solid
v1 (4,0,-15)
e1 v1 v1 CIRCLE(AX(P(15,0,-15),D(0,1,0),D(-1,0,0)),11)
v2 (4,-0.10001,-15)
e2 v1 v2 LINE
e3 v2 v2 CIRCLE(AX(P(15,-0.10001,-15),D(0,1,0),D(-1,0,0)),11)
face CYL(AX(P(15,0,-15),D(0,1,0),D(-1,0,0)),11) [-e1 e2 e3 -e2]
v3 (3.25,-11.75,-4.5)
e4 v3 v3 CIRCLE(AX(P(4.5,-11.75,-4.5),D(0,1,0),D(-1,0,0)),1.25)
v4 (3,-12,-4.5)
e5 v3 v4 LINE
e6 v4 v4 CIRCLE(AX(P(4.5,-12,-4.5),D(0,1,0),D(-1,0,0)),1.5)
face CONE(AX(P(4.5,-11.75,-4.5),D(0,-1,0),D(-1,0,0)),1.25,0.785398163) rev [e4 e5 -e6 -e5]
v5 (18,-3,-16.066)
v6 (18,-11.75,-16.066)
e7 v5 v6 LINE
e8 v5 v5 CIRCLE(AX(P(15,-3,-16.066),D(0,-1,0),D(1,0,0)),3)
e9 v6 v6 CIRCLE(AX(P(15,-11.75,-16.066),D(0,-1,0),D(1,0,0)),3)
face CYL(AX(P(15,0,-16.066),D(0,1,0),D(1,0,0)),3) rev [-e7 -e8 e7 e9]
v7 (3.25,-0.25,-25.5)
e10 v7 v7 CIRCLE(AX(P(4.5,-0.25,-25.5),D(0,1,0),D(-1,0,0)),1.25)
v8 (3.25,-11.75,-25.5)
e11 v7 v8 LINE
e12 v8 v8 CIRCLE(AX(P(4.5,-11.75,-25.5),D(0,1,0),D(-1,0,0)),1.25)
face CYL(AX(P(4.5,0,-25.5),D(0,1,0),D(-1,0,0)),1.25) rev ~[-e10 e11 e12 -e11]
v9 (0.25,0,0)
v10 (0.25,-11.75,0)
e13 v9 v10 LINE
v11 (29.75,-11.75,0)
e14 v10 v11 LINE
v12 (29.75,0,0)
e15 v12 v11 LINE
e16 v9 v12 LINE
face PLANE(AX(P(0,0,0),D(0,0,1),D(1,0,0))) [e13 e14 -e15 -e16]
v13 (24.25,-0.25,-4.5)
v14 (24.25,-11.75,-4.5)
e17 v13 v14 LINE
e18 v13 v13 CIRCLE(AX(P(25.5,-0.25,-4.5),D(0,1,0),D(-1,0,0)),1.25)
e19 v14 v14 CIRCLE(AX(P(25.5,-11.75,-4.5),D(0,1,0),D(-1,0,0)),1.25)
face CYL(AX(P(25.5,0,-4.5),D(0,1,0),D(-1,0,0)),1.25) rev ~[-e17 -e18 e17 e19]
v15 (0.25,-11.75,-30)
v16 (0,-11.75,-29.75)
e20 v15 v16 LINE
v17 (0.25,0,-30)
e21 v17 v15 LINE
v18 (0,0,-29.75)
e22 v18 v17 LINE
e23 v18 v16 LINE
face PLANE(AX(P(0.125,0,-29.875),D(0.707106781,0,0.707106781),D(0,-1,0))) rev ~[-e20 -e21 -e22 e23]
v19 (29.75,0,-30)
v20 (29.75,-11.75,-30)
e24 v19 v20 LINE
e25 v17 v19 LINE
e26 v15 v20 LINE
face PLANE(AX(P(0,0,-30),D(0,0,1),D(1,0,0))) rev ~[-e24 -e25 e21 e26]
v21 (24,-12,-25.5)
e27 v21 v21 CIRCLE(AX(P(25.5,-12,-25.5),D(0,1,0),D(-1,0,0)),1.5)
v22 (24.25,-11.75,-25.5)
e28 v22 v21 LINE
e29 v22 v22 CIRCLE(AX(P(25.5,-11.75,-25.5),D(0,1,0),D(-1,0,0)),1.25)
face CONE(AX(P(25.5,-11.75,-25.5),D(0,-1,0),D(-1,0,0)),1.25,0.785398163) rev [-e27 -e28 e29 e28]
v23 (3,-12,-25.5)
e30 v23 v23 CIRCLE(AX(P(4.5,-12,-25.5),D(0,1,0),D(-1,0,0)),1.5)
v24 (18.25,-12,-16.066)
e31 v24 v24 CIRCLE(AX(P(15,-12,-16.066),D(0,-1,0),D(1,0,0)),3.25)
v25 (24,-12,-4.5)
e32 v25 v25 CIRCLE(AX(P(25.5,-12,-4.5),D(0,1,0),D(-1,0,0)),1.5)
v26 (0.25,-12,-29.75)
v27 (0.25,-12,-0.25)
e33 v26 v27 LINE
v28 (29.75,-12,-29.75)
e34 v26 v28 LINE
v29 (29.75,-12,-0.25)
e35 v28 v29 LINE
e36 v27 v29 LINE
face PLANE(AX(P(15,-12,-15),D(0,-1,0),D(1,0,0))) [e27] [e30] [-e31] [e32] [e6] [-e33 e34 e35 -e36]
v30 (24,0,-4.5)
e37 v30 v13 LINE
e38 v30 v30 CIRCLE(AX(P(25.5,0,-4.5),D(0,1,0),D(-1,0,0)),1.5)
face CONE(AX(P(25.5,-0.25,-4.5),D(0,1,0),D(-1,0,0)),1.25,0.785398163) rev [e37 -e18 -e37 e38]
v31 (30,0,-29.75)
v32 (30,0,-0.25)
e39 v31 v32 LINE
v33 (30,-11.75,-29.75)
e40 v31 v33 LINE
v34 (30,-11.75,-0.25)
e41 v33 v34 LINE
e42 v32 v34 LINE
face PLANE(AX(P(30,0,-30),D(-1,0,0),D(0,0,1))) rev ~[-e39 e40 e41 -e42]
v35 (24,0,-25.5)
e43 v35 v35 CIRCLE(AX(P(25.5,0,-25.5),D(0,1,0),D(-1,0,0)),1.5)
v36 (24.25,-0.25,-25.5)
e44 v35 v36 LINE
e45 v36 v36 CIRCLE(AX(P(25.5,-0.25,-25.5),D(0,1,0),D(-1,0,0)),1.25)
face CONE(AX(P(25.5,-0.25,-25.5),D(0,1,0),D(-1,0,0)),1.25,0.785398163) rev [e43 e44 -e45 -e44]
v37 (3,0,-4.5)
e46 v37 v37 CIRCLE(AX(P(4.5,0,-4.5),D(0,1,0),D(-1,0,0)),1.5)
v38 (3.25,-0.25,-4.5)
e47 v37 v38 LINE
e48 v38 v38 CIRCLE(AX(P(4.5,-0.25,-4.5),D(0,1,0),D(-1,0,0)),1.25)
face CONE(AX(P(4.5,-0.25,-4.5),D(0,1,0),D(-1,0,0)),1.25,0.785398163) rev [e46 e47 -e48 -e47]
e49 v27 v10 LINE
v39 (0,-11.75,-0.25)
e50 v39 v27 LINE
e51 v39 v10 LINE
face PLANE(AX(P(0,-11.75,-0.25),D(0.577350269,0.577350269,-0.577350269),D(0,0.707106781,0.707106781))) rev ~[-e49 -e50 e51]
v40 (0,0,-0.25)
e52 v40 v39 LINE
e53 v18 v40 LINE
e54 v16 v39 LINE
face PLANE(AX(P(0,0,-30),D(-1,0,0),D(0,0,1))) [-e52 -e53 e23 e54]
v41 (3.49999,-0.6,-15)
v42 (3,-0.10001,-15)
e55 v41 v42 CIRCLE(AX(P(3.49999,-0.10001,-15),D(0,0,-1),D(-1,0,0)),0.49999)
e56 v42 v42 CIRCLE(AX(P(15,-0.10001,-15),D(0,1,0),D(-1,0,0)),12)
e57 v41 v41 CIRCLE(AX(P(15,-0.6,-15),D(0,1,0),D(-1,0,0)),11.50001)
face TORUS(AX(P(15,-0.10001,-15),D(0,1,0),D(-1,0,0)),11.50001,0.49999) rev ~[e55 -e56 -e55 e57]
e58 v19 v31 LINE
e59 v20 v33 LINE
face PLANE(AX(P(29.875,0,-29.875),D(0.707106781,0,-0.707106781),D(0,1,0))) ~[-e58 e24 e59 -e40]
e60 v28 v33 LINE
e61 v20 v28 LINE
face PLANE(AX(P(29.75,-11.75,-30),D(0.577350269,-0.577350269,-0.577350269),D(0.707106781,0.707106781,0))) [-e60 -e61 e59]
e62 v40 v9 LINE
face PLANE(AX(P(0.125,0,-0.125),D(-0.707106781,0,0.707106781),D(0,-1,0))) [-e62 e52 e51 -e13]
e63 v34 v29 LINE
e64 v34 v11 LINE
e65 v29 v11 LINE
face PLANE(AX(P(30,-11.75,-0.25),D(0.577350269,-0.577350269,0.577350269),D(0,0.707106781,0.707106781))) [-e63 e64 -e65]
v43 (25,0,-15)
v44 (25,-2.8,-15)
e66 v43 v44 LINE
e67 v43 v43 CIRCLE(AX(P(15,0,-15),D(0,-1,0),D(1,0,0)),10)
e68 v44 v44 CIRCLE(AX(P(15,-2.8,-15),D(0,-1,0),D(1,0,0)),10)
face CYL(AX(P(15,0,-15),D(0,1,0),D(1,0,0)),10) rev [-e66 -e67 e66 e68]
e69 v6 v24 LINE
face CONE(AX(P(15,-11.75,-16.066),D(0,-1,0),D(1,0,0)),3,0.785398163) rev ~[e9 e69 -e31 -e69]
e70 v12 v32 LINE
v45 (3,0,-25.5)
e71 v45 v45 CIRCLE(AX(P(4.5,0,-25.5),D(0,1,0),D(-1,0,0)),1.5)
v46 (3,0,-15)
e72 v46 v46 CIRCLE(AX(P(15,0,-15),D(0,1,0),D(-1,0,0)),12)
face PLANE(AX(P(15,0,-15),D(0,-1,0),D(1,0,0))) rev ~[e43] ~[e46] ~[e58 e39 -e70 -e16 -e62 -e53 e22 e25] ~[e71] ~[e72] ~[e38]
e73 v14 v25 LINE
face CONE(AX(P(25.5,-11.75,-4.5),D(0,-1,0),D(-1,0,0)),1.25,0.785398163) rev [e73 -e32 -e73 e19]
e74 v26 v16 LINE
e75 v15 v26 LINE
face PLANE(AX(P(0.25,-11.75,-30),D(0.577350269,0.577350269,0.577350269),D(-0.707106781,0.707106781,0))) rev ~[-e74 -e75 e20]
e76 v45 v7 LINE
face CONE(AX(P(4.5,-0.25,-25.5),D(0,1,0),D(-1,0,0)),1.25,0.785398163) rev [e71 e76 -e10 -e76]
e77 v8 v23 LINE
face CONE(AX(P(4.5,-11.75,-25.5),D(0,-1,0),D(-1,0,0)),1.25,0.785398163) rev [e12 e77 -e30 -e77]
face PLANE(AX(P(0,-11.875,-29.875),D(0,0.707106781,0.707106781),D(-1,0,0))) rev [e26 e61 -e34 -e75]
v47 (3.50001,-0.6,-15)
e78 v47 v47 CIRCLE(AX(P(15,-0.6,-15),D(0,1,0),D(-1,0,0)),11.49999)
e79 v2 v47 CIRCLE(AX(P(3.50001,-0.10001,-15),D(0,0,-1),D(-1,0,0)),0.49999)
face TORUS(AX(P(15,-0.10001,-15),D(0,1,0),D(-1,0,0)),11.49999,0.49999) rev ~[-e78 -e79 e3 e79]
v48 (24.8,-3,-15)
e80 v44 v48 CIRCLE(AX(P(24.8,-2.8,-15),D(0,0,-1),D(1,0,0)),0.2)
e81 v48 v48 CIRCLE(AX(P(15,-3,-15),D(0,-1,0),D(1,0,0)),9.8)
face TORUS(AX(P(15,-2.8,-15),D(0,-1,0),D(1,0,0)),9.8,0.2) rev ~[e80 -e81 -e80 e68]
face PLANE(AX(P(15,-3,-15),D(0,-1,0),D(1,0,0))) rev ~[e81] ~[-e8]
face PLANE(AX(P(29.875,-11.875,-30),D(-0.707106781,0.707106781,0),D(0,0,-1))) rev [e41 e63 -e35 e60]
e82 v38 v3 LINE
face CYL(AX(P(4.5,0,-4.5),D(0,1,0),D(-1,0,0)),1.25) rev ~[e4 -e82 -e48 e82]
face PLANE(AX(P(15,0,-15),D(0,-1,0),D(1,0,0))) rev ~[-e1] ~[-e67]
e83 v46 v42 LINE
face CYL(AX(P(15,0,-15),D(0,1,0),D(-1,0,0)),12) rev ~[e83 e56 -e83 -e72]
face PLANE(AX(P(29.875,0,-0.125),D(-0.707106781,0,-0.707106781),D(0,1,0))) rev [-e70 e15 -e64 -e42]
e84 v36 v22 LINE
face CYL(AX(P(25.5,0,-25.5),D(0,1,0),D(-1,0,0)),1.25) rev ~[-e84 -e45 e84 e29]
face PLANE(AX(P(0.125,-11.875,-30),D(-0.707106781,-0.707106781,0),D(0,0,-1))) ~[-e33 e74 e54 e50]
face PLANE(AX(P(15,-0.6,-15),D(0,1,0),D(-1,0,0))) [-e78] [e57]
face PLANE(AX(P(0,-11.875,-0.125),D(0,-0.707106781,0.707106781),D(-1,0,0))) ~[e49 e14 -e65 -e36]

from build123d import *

# Parameters (mm, degrees)
F0_W     = 30
F0_H     = 30
F0_R     = 10
F0_R_2   = 3
F1_DEPTH = 12
F2_DEPTH = 3
F3_R     = 0.2
F4_R     = 12
F4_R_2   = 11
F5_DEPTH = 0.6
F6_R     = 0.49999
F4_R_3   = 1.25
F7_DEPTH = 25
F8_SIZE  = 0.25


# Not quite as in the source:
# - a fillet or chamfer is up to 0.001 mm smaller than in the source, because OpenCascade refuses the exact size


with BuildPart() as f1:
    # F0 (on Front) → F1 (new body)
    with BuildSketch(Plane.XZ):
        with Locations((15, -15)):
            Rectangle(F0_W, F0_H)
        with Locations((15, -15)):
            Circle(F0_R, mode=Mode.SUBTRACT)
        with Locations((15, -15)):
            Circle(F0_R)
        with Locations((15, -16.066)):
            Circle(F0_R_2, mode=Mode.SUBTRACT)
    extrude(amount=F1_DEPTH)

    # F0 (on Front) → F2 (cut)
    with BuildSketch(Plane.XZ):
        with Locations((15, -15)):
            Circle(F0_R)
        with Locations((15, -16.066)):
            Circle(F0_R_2, mode=Mode.SUBTRACT)
    extrude(amount=F2_DEPTH, mode=Mode.SUBTRACT)

    # F3
    f3_edges = [f1.edges().sort_by_distance(p)[0] for p in [
        (5, -3, -15),
    ]]
    fillet(f3_edges, radius=F3_R)

    # F4 (on face) → F5 (cut)
    with BuildSketch(Plane(origin=(0, 0, 0), x_dir=(-1, 0, 0), z_dir=(0, 1, 0))):
        with Locations((-15, -15)):
            Circle(F4_R)
        with Locations((-15, -15)):
            Circle(F4_R_2, mode=Mode.SUBTRACT)
    extrude(amount=-F5_DEPTH, mode=Mode.SUBTRACT)

    # F6 (radius 0.5 in the source; OpenCascade refuses exactly that, so slightly less here)
    f6_edges = [f1.edges().sort_by_distance(p)[0] for p in [
        (26, -0.6, -15),
        (27, -0.6, -15),
    ]]
    fillet(f6_edges, radius=F6_R)

    # F4 (on face) → F7 (cut)
    with BuildSketch(Plane(origin=(0, 0, 0), x_dir=(-1, 0, 0), z_dir=(0, 1, 0))):
        with Locations((-4.5, -4.5)):
            Circle(F4_R_3)
        with Locations((-25.5, -4.5)):
            Circle(F4_R_3)
        with Locations((-25.5, -25.5)):
            Circle(F4_R_3)
        with Locations((-4.5, -25.5)):
            Circle(F4_R_3)
    extrude(amount=-F7_DEPTH, mode=Mode.SUBTRACT)

    # F8
    f8_edges = [f1.edges().sort_by_distance(p)[0] for p in [
        (15, -12, 0),
        (30, -12, -15),
        (0, -12, -15),
        (15, -12, -30),
        (5.75, -12, -25.5),
        (26.75, -12, -25.5),
        (12, -12, -16.066),
        (5.75, -12, -4.5),
        (26.75, -12, -4.5),
        (30, -6, 0),
        (0, -6, 0),
        (30, -6, -30),
        (0, -6, -30),
        (5.75, 0, -4.5),
        (3.25, -6, -4.5),
        (26.75, 0, -25.5),
        (5.75, 0, -25.5),
        (3.25, -6, -25.5),
        (26.75, 0, -4.5),
    ]]
    chamfer(f8_edges, length=F8_SIZE)


solid = f1.part
